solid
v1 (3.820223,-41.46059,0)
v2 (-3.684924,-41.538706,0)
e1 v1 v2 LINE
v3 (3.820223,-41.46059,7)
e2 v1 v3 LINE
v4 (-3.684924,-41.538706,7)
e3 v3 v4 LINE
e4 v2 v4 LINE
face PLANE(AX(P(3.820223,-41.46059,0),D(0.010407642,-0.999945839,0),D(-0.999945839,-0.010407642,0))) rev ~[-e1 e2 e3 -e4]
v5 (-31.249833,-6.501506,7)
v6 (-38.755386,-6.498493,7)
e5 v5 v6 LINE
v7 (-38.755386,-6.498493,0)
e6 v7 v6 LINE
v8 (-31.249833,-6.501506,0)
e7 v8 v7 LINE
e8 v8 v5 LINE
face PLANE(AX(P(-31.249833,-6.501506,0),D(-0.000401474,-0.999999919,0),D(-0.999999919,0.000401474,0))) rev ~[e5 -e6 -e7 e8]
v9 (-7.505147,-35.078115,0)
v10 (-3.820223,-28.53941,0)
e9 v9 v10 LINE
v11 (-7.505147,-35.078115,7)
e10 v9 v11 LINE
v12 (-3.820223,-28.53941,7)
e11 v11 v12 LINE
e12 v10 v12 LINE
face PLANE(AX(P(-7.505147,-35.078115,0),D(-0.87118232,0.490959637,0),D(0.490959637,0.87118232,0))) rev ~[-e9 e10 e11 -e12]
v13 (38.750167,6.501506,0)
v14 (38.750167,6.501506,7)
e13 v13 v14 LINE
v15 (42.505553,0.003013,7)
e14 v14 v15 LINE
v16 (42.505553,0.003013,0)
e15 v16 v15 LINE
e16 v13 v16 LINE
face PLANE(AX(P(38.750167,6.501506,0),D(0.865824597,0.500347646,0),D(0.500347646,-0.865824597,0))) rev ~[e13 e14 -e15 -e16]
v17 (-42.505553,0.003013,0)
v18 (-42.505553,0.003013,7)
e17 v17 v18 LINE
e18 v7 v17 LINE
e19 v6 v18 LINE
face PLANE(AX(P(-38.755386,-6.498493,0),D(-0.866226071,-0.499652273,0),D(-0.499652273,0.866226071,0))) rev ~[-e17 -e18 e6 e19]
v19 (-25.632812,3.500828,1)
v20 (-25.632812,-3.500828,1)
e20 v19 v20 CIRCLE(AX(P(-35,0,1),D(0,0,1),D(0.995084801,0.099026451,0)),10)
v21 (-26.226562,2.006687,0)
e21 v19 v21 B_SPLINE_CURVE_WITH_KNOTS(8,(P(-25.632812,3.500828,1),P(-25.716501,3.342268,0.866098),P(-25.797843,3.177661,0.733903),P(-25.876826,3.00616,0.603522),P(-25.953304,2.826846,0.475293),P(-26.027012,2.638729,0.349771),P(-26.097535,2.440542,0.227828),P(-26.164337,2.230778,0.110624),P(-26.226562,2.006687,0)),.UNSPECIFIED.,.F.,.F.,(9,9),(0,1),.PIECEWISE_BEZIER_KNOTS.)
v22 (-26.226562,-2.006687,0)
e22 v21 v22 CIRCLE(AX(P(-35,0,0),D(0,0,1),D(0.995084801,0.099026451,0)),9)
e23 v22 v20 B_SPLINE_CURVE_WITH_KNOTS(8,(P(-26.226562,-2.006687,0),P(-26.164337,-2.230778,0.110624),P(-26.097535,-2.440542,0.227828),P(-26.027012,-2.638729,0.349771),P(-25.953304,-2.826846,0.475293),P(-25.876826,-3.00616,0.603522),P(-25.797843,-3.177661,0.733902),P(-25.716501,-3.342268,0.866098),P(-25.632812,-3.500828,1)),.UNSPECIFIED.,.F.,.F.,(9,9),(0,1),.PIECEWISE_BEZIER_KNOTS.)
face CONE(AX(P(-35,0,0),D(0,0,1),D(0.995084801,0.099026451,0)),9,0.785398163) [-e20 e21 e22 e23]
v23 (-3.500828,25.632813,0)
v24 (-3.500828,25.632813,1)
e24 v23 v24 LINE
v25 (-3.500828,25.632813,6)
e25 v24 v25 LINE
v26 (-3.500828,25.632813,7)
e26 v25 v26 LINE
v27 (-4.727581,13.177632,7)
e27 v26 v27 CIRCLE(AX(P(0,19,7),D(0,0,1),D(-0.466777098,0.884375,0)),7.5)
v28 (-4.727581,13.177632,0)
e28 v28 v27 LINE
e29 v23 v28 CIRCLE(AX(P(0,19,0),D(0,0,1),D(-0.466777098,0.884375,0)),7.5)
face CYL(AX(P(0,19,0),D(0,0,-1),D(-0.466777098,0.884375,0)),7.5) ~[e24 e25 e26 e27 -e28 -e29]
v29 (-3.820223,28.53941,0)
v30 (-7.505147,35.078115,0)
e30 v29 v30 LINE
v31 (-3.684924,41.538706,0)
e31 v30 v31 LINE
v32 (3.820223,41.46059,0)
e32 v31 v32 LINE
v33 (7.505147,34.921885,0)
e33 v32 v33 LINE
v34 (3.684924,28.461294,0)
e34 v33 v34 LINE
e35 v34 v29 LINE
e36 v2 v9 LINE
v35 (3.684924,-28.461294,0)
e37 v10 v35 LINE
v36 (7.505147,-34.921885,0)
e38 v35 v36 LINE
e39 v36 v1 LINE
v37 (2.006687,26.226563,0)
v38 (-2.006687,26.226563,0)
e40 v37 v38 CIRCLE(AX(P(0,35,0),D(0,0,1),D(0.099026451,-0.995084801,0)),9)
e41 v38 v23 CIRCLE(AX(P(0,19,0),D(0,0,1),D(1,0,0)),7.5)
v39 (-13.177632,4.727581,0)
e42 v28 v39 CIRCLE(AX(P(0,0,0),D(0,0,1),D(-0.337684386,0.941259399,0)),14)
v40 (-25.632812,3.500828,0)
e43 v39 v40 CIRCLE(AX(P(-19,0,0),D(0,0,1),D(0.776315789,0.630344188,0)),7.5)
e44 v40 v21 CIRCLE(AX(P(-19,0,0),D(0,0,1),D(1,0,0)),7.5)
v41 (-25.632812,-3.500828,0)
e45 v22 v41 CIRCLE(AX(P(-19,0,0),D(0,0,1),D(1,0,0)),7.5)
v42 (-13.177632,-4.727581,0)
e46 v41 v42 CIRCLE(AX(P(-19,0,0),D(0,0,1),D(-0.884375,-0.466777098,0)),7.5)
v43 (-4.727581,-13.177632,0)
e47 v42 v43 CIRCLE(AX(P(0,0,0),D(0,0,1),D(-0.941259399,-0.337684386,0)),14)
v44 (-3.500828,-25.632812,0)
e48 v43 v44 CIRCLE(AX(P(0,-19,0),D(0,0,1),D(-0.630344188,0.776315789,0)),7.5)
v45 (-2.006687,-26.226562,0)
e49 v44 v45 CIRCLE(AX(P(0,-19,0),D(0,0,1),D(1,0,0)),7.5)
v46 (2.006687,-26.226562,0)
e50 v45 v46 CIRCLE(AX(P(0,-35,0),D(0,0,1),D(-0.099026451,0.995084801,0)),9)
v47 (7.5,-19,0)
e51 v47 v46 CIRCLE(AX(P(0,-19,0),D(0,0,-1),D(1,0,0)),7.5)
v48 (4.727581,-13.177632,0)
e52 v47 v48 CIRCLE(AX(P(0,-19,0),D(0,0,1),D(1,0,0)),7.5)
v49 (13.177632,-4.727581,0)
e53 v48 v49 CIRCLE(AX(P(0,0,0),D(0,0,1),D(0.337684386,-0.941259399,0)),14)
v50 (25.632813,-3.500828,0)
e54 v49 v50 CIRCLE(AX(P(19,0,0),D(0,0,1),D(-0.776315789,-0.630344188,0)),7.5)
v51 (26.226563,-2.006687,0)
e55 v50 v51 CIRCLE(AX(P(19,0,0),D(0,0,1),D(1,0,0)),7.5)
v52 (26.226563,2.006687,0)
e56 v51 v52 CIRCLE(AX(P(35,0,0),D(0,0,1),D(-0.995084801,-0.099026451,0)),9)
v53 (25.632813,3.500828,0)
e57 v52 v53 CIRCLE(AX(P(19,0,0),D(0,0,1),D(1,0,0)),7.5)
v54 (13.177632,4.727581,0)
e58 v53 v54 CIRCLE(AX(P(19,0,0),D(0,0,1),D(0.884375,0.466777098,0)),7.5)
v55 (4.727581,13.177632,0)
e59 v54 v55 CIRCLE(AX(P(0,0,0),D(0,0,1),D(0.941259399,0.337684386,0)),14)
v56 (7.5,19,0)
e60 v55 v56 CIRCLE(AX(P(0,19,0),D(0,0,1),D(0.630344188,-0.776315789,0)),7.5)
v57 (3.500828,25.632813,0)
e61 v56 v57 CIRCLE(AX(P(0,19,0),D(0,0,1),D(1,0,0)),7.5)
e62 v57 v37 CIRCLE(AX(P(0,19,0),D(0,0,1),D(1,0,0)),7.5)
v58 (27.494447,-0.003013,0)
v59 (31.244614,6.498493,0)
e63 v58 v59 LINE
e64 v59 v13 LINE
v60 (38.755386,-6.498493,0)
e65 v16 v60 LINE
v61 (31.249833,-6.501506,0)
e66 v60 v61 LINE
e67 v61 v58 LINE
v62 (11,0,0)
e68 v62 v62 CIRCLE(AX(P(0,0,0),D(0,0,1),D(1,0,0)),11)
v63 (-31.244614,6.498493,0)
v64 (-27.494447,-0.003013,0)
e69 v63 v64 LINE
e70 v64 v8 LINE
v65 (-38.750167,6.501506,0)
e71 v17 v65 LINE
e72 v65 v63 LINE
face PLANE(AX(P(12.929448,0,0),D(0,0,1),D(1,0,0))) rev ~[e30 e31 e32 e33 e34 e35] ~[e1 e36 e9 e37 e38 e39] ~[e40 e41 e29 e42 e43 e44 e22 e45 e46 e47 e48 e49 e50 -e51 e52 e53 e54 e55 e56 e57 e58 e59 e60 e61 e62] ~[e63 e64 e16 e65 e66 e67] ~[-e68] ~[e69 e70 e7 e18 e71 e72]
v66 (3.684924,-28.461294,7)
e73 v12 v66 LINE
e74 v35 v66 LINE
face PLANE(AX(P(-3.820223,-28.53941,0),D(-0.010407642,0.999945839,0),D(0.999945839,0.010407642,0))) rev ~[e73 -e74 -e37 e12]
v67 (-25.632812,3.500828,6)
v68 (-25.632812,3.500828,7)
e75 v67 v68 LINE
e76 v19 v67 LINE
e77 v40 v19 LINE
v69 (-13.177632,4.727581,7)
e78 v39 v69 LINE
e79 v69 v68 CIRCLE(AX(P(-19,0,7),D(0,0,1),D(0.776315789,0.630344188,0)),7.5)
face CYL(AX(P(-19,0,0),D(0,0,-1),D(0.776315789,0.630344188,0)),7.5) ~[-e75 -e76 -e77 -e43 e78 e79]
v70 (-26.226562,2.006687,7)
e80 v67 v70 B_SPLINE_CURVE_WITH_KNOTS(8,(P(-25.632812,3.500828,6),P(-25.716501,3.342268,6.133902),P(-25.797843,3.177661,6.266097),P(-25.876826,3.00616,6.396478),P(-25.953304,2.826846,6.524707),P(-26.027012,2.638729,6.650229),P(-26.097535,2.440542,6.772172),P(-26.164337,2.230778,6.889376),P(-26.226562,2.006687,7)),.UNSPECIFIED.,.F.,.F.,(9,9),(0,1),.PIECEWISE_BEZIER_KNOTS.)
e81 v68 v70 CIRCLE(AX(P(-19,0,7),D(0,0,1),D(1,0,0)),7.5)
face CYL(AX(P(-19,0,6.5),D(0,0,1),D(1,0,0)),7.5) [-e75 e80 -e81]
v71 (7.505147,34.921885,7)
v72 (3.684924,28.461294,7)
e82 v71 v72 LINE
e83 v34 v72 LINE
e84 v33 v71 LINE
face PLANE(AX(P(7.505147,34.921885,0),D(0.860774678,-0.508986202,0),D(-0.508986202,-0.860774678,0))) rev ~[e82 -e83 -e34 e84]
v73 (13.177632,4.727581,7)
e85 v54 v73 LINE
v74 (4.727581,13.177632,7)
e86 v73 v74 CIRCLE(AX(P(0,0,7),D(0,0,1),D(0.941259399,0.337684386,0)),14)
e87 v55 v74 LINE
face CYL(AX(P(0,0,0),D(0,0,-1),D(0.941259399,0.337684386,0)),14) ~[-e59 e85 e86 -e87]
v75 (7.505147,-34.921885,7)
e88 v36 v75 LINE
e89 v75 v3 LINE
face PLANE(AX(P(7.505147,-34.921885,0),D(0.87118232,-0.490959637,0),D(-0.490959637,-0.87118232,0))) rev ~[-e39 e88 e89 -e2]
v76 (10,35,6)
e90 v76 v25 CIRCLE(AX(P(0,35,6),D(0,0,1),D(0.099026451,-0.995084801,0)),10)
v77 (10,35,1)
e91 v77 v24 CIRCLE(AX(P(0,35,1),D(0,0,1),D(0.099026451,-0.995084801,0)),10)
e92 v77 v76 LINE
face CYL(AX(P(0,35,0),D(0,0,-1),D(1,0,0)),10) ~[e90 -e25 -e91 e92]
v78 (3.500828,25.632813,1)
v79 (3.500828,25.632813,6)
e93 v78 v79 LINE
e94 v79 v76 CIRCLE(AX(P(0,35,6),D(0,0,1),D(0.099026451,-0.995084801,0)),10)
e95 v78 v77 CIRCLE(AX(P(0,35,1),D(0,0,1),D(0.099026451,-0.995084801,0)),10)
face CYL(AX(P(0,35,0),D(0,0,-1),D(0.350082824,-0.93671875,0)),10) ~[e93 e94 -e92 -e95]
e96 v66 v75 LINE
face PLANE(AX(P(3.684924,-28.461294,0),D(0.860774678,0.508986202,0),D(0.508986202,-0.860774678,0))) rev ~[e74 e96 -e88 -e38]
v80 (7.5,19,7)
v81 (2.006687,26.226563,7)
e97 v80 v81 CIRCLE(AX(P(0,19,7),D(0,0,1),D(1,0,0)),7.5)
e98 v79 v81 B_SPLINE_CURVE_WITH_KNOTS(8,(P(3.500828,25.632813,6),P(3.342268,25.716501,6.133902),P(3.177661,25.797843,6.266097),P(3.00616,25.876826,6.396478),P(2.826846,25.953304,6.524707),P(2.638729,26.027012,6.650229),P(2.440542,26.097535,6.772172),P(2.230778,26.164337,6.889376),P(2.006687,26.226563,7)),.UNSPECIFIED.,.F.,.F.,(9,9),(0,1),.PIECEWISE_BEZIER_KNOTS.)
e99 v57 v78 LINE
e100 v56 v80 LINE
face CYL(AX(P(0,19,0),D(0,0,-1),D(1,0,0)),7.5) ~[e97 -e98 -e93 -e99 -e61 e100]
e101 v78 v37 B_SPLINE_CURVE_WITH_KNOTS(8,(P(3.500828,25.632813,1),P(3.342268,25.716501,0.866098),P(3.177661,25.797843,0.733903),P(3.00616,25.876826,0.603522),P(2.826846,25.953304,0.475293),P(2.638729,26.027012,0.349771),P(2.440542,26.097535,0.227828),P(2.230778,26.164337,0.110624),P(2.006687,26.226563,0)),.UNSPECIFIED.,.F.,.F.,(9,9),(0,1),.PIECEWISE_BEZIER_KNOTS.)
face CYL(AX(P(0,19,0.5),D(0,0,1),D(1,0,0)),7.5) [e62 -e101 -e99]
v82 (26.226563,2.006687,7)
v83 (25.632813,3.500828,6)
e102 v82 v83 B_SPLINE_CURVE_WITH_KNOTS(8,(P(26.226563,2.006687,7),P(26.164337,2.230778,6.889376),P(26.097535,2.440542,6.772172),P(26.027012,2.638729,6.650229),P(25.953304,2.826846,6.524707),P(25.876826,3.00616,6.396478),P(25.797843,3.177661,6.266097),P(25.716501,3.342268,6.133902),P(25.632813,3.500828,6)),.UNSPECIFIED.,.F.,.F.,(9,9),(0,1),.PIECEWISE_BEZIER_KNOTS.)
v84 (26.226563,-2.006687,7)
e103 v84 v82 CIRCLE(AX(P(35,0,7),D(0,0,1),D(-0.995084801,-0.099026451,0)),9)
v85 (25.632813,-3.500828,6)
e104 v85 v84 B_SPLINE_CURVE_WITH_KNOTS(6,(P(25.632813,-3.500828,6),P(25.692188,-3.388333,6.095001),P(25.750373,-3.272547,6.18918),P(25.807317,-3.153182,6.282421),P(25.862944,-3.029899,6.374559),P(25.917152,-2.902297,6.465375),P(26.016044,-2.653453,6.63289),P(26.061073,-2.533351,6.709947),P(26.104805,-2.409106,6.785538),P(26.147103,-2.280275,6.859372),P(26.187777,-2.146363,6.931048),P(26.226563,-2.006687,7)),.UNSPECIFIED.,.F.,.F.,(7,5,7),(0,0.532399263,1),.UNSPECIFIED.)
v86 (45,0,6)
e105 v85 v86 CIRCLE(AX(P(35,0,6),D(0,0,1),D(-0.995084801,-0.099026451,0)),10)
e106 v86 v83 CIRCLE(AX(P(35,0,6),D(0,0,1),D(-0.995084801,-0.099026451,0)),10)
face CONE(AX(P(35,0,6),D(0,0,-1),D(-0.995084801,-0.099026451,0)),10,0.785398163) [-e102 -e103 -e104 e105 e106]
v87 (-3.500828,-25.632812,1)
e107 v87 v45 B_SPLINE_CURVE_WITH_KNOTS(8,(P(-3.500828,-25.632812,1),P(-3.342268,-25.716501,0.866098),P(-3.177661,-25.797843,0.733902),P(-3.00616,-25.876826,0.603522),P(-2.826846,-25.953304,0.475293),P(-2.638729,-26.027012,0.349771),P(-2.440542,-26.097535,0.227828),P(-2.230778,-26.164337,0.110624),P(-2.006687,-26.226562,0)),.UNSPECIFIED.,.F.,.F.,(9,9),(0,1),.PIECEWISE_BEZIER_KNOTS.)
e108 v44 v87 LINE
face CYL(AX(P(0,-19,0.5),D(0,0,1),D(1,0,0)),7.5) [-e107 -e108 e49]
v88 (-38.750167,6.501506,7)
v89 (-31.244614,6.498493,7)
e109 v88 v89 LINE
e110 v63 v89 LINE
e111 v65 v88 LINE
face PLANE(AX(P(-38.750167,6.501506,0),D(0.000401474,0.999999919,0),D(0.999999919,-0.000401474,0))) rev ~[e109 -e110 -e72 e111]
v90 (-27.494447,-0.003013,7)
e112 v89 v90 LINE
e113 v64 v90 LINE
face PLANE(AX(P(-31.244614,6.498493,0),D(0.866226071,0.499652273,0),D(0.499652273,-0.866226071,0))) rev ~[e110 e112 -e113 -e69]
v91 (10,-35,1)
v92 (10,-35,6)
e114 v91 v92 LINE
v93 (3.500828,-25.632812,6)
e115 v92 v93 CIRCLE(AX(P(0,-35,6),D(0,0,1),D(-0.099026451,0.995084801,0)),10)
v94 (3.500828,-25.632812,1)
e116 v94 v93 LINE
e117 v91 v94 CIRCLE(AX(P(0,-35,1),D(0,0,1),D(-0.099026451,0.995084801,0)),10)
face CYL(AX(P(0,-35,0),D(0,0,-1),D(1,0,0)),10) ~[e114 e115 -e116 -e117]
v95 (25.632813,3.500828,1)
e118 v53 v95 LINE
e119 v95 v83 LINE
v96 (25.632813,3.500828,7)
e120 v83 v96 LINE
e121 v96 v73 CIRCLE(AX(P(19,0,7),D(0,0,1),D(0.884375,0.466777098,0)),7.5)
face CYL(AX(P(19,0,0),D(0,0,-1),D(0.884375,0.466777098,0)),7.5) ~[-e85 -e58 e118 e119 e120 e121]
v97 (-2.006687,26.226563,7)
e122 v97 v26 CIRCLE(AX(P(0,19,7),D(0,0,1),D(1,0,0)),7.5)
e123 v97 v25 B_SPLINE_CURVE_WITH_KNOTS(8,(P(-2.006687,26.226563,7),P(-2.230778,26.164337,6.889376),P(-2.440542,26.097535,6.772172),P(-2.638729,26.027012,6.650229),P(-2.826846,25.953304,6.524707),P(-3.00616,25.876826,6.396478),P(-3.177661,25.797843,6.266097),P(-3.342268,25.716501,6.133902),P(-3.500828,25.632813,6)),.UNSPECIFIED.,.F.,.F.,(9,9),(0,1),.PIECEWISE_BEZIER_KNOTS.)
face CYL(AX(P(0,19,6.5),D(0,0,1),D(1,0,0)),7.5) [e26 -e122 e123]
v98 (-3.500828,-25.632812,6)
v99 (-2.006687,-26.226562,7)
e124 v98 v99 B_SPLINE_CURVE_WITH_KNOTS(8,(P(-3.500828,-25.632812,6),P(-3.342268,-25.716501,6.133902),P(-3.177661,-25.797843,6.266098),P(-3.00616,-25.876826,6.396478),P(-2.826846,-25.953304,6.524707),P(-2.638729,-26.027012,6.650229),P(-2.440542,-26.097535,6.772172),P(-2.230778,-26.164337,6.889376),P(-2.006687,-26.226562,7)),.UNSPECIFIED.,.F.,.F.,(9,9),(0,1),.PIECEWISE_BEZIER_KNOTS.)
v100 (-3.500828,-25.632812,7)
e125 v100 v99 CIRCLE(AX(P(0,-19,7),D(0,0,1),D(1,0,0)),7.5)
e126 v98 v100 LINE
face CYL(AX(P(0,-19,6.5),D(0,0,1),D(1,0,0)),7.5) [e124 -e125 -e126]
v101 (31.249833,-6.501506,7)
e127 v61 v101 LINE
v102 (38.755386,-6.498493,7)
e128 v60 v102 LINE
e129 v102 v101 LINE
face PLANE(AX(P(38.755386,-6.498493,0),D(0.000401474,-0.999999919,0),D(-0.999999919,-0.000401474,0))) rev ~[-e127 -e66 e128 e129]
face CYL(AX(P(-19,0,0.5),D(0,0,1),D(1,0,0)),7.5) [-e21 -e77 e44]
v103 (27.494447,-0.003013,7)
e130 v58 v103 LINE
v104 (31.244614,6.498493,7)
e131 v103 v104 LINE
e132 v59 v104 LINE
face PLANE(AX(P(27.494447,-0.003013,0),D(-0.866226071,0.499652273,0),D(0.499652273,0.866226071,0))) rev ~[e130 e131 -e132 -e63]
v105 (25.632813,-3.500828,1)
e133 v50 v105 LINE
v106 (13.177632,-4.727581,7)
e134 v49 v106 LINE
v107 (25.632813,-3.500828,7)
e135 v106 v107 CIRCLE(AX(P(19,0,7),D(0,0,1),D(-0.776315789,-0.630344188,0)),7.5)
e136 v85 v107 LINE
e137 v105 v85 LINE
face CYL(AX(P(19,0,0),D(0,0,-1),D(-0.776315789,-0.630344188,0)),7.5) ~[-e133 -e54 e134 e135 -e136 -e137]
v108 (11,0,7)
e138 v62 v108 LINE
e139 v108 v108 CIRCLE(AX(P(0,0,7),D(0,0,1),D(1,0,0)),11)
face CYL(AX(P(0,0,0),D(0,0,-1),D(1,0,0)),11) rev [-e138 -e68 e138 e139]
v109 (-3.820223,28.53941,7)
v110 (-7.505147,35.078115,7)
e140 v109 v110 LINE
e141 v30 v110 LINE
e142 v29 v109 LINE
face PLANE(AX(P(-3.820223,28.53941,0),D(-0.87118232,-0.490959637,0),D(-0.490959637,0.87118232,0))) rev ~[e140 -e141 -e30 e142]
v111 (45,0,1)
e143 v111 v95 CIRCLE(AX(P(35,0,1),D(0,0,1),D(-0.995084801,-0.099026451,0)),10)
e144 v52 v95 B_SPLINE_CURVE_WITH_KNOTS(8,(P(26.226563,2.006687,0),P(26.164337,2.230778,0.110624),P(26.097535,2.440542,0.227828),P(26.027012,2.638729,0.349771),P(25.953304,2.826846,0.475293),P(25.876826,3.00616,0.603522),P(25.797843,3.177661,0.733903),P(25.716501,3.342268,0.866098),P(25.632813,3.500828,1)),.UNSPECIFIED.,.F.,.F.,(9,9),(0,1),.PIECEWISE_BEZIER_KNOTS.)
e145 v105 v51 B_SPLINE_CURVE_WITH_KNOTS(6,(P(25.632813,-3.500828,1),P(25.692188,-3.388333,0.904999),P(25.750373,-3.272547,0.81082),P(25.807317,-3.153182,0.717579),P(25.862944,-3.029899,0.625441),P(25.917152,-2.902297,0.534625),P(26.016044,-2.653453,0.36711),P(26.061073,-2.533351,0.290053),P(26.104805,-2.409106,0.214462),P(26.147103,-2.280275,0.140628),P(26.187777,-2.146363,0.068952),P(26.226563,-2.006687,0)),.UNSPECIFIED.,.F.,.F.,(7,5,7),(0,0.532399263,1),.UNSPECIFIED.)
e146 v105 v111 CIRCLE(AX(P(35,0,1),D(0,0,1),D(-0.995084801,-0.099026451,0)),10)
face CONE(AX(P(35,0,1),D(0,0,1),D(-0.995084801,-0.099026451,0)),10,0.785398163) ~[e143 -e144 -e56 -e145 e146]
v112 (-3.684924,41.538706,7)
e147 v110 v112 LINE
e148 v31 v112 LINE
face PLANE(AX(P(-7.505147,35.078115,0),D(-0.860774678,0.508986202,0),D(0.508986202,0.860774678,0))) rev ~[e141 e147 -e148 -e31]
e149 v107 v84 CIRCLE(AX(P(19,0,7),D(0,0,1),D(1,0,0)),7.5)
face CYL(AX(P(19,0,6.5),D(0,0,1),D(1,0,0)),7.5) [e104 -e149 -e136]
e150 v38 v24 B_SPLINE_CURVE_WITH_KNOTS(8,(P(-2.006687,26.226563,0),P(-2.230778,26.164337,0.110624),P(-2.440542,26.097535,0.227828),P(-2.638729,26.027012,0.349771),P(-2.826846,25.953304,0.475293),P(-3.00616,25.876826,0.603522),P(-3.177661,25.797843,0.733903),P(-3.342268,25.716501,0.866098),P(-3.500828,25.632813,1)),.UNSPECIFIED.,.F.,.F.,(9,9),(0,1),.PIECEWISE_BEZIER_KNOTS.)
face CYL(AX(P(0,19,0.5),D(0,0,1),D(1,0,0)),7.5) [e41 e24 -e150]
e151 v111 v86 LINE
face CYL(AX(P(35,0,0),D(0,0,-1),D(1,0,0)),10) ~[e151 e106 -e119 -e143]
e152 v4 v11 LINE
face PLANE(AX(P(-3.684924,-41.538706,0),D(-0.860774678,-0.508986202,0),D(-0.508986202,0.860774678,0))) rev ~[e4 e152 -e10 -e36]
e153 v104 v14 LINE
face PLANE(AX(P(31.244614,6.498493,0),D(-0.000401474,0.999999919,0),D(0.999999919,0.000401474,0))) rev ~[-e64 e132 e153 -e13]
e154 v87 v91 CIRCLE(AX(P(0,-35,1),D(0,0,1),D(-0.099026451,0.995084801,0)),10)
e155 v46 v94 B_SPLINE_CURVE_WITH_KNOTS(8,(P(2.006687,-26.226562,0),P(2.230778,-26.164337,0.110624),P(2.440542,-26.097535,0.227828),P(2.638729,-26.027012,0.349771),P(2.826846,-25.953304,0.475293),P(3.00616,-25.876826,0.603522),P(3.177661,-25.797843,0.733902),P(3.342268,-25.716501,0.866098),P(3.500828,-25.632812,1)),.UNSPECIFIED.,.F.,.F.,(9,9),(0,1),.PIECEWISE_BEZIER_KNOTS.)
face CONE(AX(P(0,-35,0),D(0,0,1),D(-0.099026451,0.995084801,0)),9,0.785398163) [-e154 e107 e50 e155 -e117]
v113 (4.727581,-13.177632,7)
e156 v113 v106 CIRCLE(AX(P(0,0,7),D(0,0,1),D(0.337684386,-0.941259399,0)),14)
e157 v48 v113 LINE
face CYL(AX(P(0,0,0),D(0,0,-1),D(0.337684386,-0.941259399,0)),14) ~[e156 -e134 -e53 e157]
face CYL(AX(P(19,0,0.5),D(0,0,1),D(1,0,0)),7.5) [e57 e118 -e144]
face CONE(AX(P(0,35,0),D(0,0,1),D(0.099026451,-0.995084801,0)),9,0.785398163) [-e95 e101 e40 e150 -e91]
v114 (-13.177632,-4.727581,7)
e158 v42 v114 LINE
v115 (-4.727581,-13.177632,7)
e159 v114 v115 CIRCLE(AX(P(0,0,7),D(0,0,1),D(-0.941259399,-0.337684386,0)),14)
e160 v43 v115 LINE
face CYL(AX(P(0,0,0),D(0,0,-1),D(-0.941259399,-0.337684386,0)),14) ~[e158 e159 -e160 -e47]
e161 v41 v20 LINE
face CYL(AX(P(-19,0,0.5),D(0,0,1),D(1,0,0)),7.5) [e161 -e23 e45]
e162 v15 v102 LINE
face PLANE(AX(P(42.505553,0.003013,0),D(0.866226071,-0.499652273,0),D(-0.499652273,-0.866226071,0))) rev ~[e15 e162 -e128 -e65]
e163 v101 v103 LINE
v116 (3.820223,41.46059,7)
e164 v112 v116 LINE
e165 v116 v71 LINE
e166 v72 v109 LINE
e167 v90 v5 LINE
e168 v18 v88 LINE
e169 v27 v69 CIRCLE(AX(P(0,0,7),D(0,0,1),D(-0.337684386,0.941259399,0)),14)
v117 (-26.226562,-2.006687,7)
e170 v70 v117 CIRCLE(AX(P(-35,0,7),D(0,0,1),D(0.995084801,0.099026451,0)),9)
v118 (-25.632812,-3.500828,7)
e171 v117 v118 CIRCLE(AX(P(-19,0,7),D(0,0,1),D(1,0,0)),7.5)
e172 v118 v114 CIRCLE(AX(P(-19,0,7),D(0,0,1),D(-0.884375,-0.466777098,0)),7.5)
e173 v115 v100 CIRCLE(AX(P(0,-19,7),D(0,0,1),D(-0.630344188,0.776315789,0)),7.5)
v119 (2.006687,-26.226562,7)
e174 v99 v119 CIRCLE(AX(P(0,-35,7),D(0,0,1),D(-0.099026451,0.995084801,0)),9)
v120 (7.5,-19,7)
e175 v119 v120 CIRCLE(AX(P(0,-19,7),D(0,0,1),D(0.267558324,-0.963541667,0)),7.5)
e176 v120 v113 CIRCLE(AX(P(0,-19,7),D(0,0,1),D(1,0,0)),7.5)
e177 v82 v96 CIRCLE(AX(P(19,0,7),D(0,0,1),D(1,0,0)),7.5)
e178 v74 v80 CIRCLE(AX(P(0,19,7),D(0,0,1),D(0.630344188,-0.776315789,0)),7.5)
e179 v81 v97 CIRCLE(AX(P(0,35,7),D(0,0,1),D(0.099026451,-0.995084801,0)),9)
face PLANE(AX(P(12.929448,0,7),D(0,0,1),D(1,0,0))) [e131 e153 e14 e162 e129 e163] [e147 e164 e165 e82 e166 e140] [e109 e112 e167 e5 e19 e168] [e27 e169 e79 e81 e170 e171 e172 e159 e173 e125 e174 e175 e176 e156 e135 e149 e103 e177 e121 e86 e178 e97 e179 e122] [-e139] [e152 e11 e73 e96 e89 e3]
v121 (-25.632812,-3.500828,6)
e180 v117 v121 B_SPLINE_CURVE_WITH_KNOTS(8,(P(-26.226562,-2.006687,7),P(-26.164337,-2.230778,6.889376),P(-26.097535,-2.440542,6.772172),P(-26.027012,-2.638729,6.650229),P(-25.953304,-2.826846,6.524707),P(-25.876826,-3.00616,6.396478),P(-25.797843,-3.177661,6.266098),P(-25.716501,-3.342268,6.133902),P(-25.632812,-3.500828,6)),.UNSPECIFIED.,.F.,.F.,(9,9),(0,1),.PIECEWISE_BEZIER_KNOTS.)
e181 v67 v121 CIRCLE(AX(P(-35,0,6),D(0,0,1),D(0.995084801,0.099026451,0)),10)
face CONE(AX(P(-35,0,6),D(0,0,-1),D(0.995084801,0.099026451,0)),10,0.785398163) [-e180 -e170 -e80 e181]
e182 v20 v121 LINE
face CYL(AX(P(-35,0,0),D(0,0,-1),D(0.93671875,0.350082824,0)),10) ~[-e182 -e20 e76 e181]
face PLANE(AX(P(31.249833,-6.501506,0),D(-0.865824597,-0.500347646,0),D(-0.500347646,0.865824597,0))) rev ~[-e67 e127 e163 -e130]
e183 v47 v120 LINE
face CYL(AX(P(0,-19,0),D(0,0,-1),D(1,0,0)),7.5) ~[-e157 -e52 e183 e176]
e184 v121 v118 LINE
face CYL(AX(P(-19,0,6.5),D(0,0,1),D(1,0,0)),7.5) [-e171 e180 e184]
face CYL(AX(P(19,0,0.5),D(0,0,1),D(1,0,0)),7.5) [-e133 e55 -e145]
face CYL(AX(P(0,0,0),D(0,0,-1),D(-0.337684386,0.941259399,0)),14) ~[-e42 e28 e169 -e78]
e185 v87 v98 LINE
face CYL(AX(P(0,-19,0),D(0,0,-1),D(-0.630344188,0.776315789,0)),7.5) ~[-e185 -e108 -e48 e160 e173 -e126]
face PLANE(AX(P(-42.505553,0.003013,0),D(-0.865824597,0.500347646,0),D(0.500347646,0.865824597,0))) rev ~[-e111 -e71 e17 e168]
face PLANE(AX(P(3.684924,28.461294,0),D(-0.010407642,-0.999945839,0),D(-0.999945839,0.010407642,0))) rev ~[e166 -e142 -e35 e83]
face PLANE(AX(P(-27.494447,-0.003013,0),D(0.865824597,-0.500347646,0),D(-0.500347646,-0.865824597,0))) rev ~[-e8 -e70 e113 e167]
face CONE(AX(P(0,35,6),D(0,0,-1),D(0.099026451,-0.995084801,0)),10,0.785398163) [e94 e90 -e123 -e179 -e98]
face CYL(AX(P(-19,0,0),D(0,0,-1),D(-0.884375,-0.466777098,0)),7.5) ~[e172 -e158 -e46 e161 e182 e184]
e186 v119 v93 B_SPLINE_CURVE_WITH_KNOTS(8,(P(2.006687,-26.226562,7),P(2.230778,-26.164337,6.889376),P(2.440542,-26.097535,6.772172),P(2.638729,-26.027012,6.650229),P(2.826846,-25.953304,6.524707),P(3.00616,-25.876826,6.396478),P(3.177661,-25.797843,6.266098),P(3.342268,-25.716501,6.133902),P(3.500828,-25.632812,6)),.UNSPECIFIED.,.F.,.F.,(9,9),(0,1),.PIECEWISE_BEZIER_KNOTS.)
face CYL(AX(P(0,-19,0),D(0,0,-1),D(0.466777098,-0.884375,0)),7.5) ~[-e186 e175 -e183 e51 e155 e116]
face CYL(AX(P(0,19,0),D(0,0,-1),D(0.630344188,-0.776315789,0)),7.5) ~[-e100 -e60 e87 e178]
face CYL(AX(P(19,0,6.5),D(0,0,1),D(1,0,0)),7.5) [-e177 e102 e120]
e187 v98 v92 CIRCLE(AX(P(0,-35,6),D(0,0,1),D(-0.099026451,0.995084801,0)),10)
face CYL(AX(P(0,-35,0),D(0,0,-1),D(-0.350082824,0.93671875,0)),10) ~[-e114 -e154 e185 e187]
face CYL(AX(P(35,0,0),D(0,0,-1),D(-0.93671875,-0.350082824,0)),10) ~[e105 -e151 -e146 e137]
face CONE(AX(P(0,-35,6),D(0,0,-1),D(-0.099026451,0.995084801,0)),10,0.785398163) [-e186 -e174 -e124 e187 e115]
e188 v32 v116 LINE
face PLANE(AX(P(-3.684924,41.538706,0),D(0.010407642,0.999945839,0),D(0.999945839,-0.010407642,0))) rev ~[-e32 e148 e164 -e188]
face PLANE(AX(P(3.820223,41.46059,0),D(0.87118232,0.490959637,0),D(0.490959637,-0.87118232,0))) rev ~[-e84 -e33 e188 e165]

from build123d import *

# Parameters (mm, degrees)
F0_R         = 11
F1_DEPTH     = 7
F2_T4_ANGLE  = 348.6337760753
F2_S5_R      = 7.5
F2_T6_DEPTH  = 16
F2_T10_ANGLE = 348.6337760753
F2_S11_R     = 7.5
F2_T12_DEPTH = 16
F2_T16_ANGLE = 348.6337760753
F2_S17_R     = 7.5
F2_T18_DEPTH = 16
F2_T22_ANGLE = 348.6337760753
F2_S23_R     = 7.5
F2_T24_DEPTH = 16
F3_T4_ANGLE  = 348.6337760753
F3_S5_R      = 7.5
F3_T6_DEPTH  = 16
F3_T10_ANGLE = 348.6337760753
F3_S11_R     = 7.5
F3_T12_DEPTH = 16
F3_T16_ANGLE = 348.6337760753
F3_S17_R     = 7.5
F3_T18_DEPTH = 16
F3_T22_ANGLE = 348.6337760753
F3_S23_R     = 7.5
F3_T24_DEPTH = 16


# Not quite as in the source:
# - a fillet or chamfer that OpenCascade refuses, or shapes differently, is made with other operations: its cross-section is extruded or revolved along the edge and cut away or added


with BuildPart() as f1:
    # F0 (on Top) → F1 (new body)
    with BuildSketch(Plane.XY):
        with BuildLine():
            ThreePointArc((13.1776315789, -4.727581408), (13.7928757354, -2.3992871748), (14, 0))
            ThreePointArc((14, 0), (13.7928757354, 2.3992871748), (13.1776315789, 4.727581408))
            ThreePointArc((13.1776315789, 4.727581408), (11.5, 0), (13.1776315789, -4.727581408))
        make_face()
        with BuildLine():
            ThreePointArc((13.1776315789, 4.727581408), (13.7928757354, 2.3992871748), (14, 0))
            ThreePointArc((14, 0), (13.7928757354, -2.3992871748), (13.1776315789, -4.727581408))
            ThreePointArc((13.1776315789, -4.727581408), (19.7351433448, -7.4638839931), (25.6328125, -3.5008282363))
            ThreePointArc((25.6328125, -3.5008282363), (25, 0), (25.6328125, 3.5008282363))
            ThreePointArc((25.6328125, 3.5008282363), (19.7351433448, 7.4638839931), (13.1776315789, 4.727581408))
        make_face()
        with BuildLine():
            ThreePointArc((13.1776315789, -4.727581408), (11.5, 0), (13.1776315789, 4.727581408))
            ThreePointArc((13.1776315789, 4.727581408), (9.8994949366, 9.8994949366), (4.727581408, 13.1776315789))
            ThreePointArc((4.727581408, 13.1776315789), (0, 11.5), (-4.727581408, 13.1776315789))
            ThreePointArc((-4.727581408, 13.1776315789), (-9.8994949366, 9.8994949366), (-13.1776315789, 4.727581408))
            ThreePointArc((-13.1776315789, 4.727581408), (-11.9318402976, 2.5082102027), (-11.5, 0))
            ThreePointArc((-11.5, 0), (-11.9318402976, -2.5082102027), (-13.1776315789, -4.727581408))
            ThreePointArc((-13.1776315789, -4.727581408), (-9.8994949366, -9.8994949366), (-4.727581408, -13.1776315789))
            ThreePointArc((-4.727581408, -13.1776315789), (0, -11.5), (4.727581408, -13.1776315789))
            ThreePointArc((4.727581408, -13.1776315789), (9.8994949366, -9.8994949366), (13.1776315789, -4.727581408))
        make_face()
        Circle(F0_R, mode=Mode.SUBTRACT)
        with BuildLine():
            ThreePointArc((-4.727581408, 13.1776315789), (0, 11.5), (4.727581408, 13.1776315789))
            ThreePointArc((4.727581408, 13.1776315789), (0, 14), (-4.727581408, 13.1776315789))
        make_face()
        with BuildLine():
            ThreePointArc((-4.727581408, 13.1776315789), (0, 14), (4.727581408, 13.1776315789))
            ThreePointArc((4.727581408, 13.1776315789), (6.7715160991, 15.7756287869), (7.5, 19))
            ThreePointArc((7.5, 19), (6.4228580777, 22.8725823573), (3.5008282363, 25.6328125))
            ThreePointArc((3.5008282363, 25.6328125), (0, 25), (-3.5008282363, 25.6328125))
            ThreePointArc((-3.5008282363, 25.6328125), (-7.4638839931, 19.7351433448), (-4.727581408, 13.1776315789))
        make_face()
        with BuildLine():
            ThreePointArc((45, 0), (36.7787811838, 9.8405252655), (25.6328125, 3.5008282363))
            ThreePointArc((25.6328125, 3.5008282363), (26.2799757469, 1.8033172558), (26.5, 0))
            ThreePointArc((26.5, 0), (26.2799757469, -1.8033172558), (25.6328125, -3.5008282363))
            ThreePointArc((25.6328125, -3.5008282363), (36.7787811838, -9.8405252655), (45, 0))
        make_face()
        Polygon((31.2446139721, 6.4984928341), (38.7501668667, 6.5015061182), (42.5055528946, 0.0030132841), (38.7553860279, -6.4984928341), (31.2498331333, -6.5015061182), (27.4944471054, -0.0030132841), align=None, mode=Mode.SUBTRACT)
        with BuildLine():
            ThreePointArc((26.5, 0), (26.2799757469, 1.8033172558), (25.6328125, 3.5008282363))
            ThreePointArc((25.6328125, 3.5008282363), (25, 0), (25.6328125, -3.5008282363))
            ThreePointArc((25.6328125, -3.5008282363), (26.2799757469, -1.8033172558), (26.5, 0))
        make_face()
        with BuildLine():
            ThreePointArc((7.5, -19), (6.7715160991, -15.7756287869), (4.727581408, -13.1776315789))
            ThreePointArc((4.727581408, -13.1776315789), (0, -14), (-4.727581408, -13.1776315789))
            ThreePointArc((-4.727581408, -13.1776315789), (-7.4638839931, -19.7351433448), (-3.5008282363, -25.6328125))
            ThreePointArc((-3.5008282363, -25.6328125), (0, -25), (3.5008282363, -25.6328125))
            ThreePointArc((3.5008282363, -25.6328125), (6.4228580777, -22.8725823573), (7.5, -19))
        make_face()
        with BuildLine():
            ThreePointArc((-4.727581408, -13.1776315789), (0, -14), (4.727581408, -13.1776315789))
            ThreePointArc((4.727581408, -13.1776315789), (0, -11.5), (-4.727581408, -13.1776315789))
        make_face()
        with BuildLine():
            ThreePointArc((-11.5, 0), (-11.9318402976, 2.5082102027), (-13.1776315789, 4.727581408))
            ThreePointArc((-13.1776315789, 4.727581408), (-14, 0), (-13.1776315789, -4.727581408))
            ThreePointArc((-13.1776315789, -4.727581408), (-11.9318402976, -2.5082102027), (-11.5, 0))
        make_face()
        with BuildLine():
            ThreePointArc((-13.1776315789, -4.727581408), (-14, 0), (-13.1776315789, 4.727581408))
            ThreePointArc((-13.1776315789, 4.727581408), (-19.7351433448, 7.4638839931), (-25.6328125, 3.5008282363))
            ThreePointArc((-25.6328125, 3.5008282363), (-25.1594747345, 1.7787811838), (-25, 0))
            ThreePointArc((-25, 0), (-25.1594747345, -1.7787811838), (-25.6328125, -3.5008282363))
            ThreePointArc((-25.6328125, -3.5008282363), (-19.7351433448, -7.4638839931), (-13.1776315789, -4.727581408))
        make_face()
        with BuildLine():
            ThreePointArc((10, 35), (-5.7005139083, 43.216090383), (-3.5008282363, 25.6328125))
            ThreePointArc((-3.5008282363, 25.6328125), (0, 26.5), (3.5008282363, 25.6328125))
            ThreePointArc((3.5008282363, 25.6328125), (8.216090383, 29.2994860917), (10, 35))
        make_face()
        Polygon((-3.684923821, 41.5387055115), (3.8202231703, 41.4605903958), (7.5051469914, 34.9218848843), (3.684923821, 28.4612944885), (-3.8202231703, 28.5394096042), (-7.5051469914, 35.0781151157), align=None, mode=Mode.SUBTRACT)
        with BuildLine():
            ThreePointArc((3.5008282363, 25.6328125), (0, 26.5), (-3.5008282363, 25.6328125))
            ThreePointArc((-3.5008282363, 25.6328125), (0, 25), (3.5008282363, 25.6328125))
        make_face()
        with BuildLine():
            ThreePointArc((3.5008282363, -25.6328125), (0, -25), (-3.5008282363, -25.6328125))
            ThreePointArc((-3.5008282363, -25.6328125), (0, -26.5), (3.5008282363, -25.6328125))
        make_face()
        with BuildLine():
            ThreePointArc((3.5008282363, -25.6328125), (0, -26.5), (-3.5008282363, -25.6328125))
            ThreePointArc((-3.5008282363, -25.6328125), (-5.7005139083, -43.216090383), (10, -35))
            ThreePointArc((10, -35), (8.216090383, -29.2994860917), (3.5008282363, -25.6328125))
        make_face()
        Polygon((3.8202231703, -41.4605903958), (-3.684923821, -41.5387055115), (-7.5051469914, -35.0781151157), (-3.8202231703, -28.5394096042), (3.684923821, -28.4612944885), (7.5051469914, -34.9218848843), align=None, mode=Mode.SUBTRACT)
        with BuildLine():
            ThreePointArc((-25, 0), (-25.1594747345, 1.7787811838), (-25.6328125, 3.5008282363))
            ThreePointArc((-25.6328125, 3.5008282363), (-26.5, 0), (-25.6328125, -3.5008282363))
            ThreePointArc((-25.6328125, -3.5008282363), (-25.1594747345, -1.7787811838), (-25, 0))
        make_face()
        with BuildLine():
            ThreePointArc((-25.6328125, -3.5008282363), (-26.5, 0), (-25.6328125, 3.5008282363))
            ThreePointArc((-25.6328125, 3.5008282363), (-45, 0), (-25.6328125, -3.5008282363))
        make_face()
        Polygon((-38.7501668667, 6.5015061182), (-31.2446139721, 6.4984928341), (-27.4944471054, -0.0030132841), (-31.2498331333, -6.5015061182), (-38.7553860279, -6.4984928341), (-42.5055528946, 0.0030132841), align=None, mode=Mode.SUBTRACT)
    extrude(amount=F1_DEPTH)

    # F2: chamfer of 1 on 4 edges, made by hand


with BuildPart() as f2_tool2:
    # F2_s3 → F2_t4 (revolve)
    with BuildSketch(Plane(origin=(-0.3432183296, 3.4488900698, 0), x_dir=(0, 0, 1), z_dir=(0.099026451, -0.9950848014, 0))):
        Polygon((6, 24.8279680496), (7, 25.8279680496), (7, 24.8279680496), align=None)
    revolve(axis=Axis((-35, 0, 7), (0, 0, 1)), revolution_arc=F2_T4_ANGLE)

    # F2_s5 → F2_t6 (cut, symmetric)
    with BuildSketch(Plane.XY.offset(6.5)):
        with Locations((-19, 0)):
            Circle(F2_S5_R)
    extrude(amount=F2_T6_DEPTH, both=True, mode=Mode.SUBTRACT)


with BuildPart() as f1_1:
    add(f1.part)

    # F2_t1: cut F2_tool2
    add(f2_tool2.part, mode=Mode.SUBTRACT)


with BuildPart() as f2_tool8:
    # F2_s9 → F2_t10 (revolve)
    with BuildSketch(Plane(origin=(3.4488900698, 0.3432183296, 0), x_dir=(0, 0, 1), z_dir=(-0.9950848014, -0.099026451, 0))):
        Polygon((6, 24.8279680496), (7, 25.8279680496), (7, 24.8279680496), align=None)
    revolve(axis=Axis((0, 35, 7), (0, 0, 1)), revolution_arc=F2_T10_ANGLE)

    # F2_s11 → F2_t12 (cut, symmetric)
    with BuildSketch(Plane.XY.offset(6.5)):
        with Locations((0, 19)):
            Circle(F2_S11_R)
    extrude(amount=F2_T12_DEPTH, both=True, mode=Mode.SUBTRACT)


with BuildPart() as f1_2:
    add(f1_1.part)

    # F2_t7: cut F2_tool8
    add(f2_tool8.part, mode=Mode.SUBTRACT)


with BuildPart() as f2_tool14:
    # F2_s15 → F2_t16 (revolve)
    with BuildSketch(Plane(origin=(-3.4488900698, -0.3432183296, 0), x_dir=(0, 0, 1), z_dir=(0.9950848014, 0.099026451, 0))):
        Polygon((6, 24.8279680496), (7, 25.8279680496), (7, 24.8279680496), align=None)
    revolve(axis=Axis((0, -35, 7), (0, 0, 1)), revolution_arc=F2_T16_ANGLE)

    # F2_s17 → F2_t18 (cut, symmetric)
    with BuildSketch(Plane.XY.offset(6.5)):
        with Locations((0, -19)):
            Circle(F2_S17_R)
    extrude(amount=F2_T18_DEPTH, both=True, mode=Mode.SUBTRACT)


with BuildPart() as f1_3:
    add(f1_2.part)

    # F2_t13: cut F2_tool14
    add(f2_tool14.part, mode=Mode.SUBTRACT)


with BuildPart() as f2_tool20:
    # F2_s21 → F2_t22 (revolve)
    with BuildSketch(Plane(origin=(0.3432183296, -3.4488900698, 0), x_dir=(0, 0, 1), z_dir=(-0.099026451, 0.9950848014, 0))):
        Polygon((6, 24.8279680496), (7, 25.8279680496), (7, 24.8279680496), align=None)
    revolve(axis=Axis((35, 0, 7), (0, 0, 1)), revolution_arc=F2_T22_ANGLE)

    # F2_s23 → F2_t24 (cut, symmetric)
    with BuildSketch(Plane.XY.offset(6.5)):
        with Locations((19, 0)):
            Circle(F2_S23_R)
    extrude(amount=F2_T24_DEPTH, both=True, mode=Mode.SUBTRACT)


with BuildPart() as f1_4:
    add(f1_3.part)

    # F2_t19: cut F2_tool20
    add(f2_tool20.part, mode=Mode.SUBTRACT)

    # F3: chamfer of 1 on 4 edges, made by hand


with BuildPart() as f3_tool2:
    # F3_s3 → F3_t4 (revolve)
    with BuildSketch(Plane(origin=(-0.3432183296, 3.4488900698, 0), x_dir=(0, 0, 1), z_dir=(0.099026451, -0.9950848014, 0))):
        Polygon((0, 25.8279680496), (1, 24.8279680496), (0, 24.8279680496), align=None)
    revolve(axis=Axis((-35, 0, 0), (0, 0, 1)), revolution_arc=F3_T4_ANGLE)

    # F3_s5 → F3_t6 (cut, symmetric)
    with BuildSketch(Plane.XY.offset(0.5)):
        with Locations((-19, 0)):
            Circle(F3_S5_R)
    extrude(amount=F3_T6_DEPTH, both=True, mode=Mode.SUBTRACT)


with BuildPart() as f1_5:
    add(f1_4.part)

    # F3_t1: cut F3_tool2
    add(f3_tool2.part, mode=Mode.SUBTRACT)


with BuildPart() as f3_tool8:
    # F3_s9 → F3_t10 (revolve)
    with BuildSketch(Plane(origin=(-3.4488900698, -0.3432183296, 0), x_dir=(0, 0, 1), z_dir=(0.9950848014, 0.099026451, 0))):
        Polygon((0, 25.8279680496), (1, 24.8279680496), (0, 24.8279680496), align=None)
    revolve(axis=Axis((0, -35, 0), (0, 0, 1)), revolution_arc=F3_T10_ANGLE)

    # F3_s11 → F3_t12 (cut, symmetric)
    with BuildSketch(Plane.XY.offset(0.5)):
        with Locations((0, -19)):
            Circle(F3_S11_R)
    extrude(amount=F3_T12_DEPTH, both=True, mode=Mode.SUBTRACT)


with BuildPart() as f1_6:
    add(f1_5.part)

    # F3_t7: cut F3_tool8
    add(f3_tool8.part, mode=Mode.SUBTRACT)


with BuildPart() as f3_tool14:
    # F3_s15 → F3_t16 (revolve)
    with BuildSketch(Plane(origin=(0.3432183296, -3.4488900698, 0), x_dir=(0, 0, 1), z_dir=(-0.099026451, 0.9950848014, 0))):
        Polygon((1, 24.8279680496), (0, 25.8279680496), (0, 24.8279680496), align=None)
    revolve(axis=Axis((35, 0, 0), (0, 0, 1)), revolution_arc=F3_T16_ANGLE)

    # F3_s17 → F3_t18 (cut, symmetric)
    with BuildSketch(Plane.XY.offset(0.5)):
        with Locations((19, 0)):
            Circle(F3_S17_R)
    extrude(amount=F3_T18_DEPTH, both=True, mode=Mode.SUBTRACT)


with BuildPart() as f1_7:
    add(f1_6.part)

    # F3_t13: cut F3_tool14
    add(f3_tool14.part, mode=Mode.SUBTRACT)


with BuildPart() as f3_tool20:
    # F3_s21 → F3_t22 (revolve)
    with BuildSketch(Plane(origin=(3.4488900698, 0.3432183296, 0), x_dir=(0, 0, 1), z_dir=(-0.9950848014, -0.099026451, 0))):
        Polygon((0, 25.8279680496), (1, 24.8279680496), (0, 24.8279680496), align=None)
    revolve(axis=Axis((0, 35, 0), (0, 0, 1)), revolution_arc=F3_T22_ANGLE)

    # F3_s23 → F3_t24 (cut, symmetric)
    with BuildSketch(Plane.XY.offset(0.5)):
        with Locations((0, 19)):
            Circle(F3_S23_R)
    extrude(amount=F3_T24_DEPTH, both=True, mode=Mode.SUBTRACT)


with BuildPart() as f1_8:
    add(f1_7.part)

    # F3_t19: cut F3_tool20
    add(f3_tool20.part, mode=Mode.SUBTRACT)


solid = f1_8.part
